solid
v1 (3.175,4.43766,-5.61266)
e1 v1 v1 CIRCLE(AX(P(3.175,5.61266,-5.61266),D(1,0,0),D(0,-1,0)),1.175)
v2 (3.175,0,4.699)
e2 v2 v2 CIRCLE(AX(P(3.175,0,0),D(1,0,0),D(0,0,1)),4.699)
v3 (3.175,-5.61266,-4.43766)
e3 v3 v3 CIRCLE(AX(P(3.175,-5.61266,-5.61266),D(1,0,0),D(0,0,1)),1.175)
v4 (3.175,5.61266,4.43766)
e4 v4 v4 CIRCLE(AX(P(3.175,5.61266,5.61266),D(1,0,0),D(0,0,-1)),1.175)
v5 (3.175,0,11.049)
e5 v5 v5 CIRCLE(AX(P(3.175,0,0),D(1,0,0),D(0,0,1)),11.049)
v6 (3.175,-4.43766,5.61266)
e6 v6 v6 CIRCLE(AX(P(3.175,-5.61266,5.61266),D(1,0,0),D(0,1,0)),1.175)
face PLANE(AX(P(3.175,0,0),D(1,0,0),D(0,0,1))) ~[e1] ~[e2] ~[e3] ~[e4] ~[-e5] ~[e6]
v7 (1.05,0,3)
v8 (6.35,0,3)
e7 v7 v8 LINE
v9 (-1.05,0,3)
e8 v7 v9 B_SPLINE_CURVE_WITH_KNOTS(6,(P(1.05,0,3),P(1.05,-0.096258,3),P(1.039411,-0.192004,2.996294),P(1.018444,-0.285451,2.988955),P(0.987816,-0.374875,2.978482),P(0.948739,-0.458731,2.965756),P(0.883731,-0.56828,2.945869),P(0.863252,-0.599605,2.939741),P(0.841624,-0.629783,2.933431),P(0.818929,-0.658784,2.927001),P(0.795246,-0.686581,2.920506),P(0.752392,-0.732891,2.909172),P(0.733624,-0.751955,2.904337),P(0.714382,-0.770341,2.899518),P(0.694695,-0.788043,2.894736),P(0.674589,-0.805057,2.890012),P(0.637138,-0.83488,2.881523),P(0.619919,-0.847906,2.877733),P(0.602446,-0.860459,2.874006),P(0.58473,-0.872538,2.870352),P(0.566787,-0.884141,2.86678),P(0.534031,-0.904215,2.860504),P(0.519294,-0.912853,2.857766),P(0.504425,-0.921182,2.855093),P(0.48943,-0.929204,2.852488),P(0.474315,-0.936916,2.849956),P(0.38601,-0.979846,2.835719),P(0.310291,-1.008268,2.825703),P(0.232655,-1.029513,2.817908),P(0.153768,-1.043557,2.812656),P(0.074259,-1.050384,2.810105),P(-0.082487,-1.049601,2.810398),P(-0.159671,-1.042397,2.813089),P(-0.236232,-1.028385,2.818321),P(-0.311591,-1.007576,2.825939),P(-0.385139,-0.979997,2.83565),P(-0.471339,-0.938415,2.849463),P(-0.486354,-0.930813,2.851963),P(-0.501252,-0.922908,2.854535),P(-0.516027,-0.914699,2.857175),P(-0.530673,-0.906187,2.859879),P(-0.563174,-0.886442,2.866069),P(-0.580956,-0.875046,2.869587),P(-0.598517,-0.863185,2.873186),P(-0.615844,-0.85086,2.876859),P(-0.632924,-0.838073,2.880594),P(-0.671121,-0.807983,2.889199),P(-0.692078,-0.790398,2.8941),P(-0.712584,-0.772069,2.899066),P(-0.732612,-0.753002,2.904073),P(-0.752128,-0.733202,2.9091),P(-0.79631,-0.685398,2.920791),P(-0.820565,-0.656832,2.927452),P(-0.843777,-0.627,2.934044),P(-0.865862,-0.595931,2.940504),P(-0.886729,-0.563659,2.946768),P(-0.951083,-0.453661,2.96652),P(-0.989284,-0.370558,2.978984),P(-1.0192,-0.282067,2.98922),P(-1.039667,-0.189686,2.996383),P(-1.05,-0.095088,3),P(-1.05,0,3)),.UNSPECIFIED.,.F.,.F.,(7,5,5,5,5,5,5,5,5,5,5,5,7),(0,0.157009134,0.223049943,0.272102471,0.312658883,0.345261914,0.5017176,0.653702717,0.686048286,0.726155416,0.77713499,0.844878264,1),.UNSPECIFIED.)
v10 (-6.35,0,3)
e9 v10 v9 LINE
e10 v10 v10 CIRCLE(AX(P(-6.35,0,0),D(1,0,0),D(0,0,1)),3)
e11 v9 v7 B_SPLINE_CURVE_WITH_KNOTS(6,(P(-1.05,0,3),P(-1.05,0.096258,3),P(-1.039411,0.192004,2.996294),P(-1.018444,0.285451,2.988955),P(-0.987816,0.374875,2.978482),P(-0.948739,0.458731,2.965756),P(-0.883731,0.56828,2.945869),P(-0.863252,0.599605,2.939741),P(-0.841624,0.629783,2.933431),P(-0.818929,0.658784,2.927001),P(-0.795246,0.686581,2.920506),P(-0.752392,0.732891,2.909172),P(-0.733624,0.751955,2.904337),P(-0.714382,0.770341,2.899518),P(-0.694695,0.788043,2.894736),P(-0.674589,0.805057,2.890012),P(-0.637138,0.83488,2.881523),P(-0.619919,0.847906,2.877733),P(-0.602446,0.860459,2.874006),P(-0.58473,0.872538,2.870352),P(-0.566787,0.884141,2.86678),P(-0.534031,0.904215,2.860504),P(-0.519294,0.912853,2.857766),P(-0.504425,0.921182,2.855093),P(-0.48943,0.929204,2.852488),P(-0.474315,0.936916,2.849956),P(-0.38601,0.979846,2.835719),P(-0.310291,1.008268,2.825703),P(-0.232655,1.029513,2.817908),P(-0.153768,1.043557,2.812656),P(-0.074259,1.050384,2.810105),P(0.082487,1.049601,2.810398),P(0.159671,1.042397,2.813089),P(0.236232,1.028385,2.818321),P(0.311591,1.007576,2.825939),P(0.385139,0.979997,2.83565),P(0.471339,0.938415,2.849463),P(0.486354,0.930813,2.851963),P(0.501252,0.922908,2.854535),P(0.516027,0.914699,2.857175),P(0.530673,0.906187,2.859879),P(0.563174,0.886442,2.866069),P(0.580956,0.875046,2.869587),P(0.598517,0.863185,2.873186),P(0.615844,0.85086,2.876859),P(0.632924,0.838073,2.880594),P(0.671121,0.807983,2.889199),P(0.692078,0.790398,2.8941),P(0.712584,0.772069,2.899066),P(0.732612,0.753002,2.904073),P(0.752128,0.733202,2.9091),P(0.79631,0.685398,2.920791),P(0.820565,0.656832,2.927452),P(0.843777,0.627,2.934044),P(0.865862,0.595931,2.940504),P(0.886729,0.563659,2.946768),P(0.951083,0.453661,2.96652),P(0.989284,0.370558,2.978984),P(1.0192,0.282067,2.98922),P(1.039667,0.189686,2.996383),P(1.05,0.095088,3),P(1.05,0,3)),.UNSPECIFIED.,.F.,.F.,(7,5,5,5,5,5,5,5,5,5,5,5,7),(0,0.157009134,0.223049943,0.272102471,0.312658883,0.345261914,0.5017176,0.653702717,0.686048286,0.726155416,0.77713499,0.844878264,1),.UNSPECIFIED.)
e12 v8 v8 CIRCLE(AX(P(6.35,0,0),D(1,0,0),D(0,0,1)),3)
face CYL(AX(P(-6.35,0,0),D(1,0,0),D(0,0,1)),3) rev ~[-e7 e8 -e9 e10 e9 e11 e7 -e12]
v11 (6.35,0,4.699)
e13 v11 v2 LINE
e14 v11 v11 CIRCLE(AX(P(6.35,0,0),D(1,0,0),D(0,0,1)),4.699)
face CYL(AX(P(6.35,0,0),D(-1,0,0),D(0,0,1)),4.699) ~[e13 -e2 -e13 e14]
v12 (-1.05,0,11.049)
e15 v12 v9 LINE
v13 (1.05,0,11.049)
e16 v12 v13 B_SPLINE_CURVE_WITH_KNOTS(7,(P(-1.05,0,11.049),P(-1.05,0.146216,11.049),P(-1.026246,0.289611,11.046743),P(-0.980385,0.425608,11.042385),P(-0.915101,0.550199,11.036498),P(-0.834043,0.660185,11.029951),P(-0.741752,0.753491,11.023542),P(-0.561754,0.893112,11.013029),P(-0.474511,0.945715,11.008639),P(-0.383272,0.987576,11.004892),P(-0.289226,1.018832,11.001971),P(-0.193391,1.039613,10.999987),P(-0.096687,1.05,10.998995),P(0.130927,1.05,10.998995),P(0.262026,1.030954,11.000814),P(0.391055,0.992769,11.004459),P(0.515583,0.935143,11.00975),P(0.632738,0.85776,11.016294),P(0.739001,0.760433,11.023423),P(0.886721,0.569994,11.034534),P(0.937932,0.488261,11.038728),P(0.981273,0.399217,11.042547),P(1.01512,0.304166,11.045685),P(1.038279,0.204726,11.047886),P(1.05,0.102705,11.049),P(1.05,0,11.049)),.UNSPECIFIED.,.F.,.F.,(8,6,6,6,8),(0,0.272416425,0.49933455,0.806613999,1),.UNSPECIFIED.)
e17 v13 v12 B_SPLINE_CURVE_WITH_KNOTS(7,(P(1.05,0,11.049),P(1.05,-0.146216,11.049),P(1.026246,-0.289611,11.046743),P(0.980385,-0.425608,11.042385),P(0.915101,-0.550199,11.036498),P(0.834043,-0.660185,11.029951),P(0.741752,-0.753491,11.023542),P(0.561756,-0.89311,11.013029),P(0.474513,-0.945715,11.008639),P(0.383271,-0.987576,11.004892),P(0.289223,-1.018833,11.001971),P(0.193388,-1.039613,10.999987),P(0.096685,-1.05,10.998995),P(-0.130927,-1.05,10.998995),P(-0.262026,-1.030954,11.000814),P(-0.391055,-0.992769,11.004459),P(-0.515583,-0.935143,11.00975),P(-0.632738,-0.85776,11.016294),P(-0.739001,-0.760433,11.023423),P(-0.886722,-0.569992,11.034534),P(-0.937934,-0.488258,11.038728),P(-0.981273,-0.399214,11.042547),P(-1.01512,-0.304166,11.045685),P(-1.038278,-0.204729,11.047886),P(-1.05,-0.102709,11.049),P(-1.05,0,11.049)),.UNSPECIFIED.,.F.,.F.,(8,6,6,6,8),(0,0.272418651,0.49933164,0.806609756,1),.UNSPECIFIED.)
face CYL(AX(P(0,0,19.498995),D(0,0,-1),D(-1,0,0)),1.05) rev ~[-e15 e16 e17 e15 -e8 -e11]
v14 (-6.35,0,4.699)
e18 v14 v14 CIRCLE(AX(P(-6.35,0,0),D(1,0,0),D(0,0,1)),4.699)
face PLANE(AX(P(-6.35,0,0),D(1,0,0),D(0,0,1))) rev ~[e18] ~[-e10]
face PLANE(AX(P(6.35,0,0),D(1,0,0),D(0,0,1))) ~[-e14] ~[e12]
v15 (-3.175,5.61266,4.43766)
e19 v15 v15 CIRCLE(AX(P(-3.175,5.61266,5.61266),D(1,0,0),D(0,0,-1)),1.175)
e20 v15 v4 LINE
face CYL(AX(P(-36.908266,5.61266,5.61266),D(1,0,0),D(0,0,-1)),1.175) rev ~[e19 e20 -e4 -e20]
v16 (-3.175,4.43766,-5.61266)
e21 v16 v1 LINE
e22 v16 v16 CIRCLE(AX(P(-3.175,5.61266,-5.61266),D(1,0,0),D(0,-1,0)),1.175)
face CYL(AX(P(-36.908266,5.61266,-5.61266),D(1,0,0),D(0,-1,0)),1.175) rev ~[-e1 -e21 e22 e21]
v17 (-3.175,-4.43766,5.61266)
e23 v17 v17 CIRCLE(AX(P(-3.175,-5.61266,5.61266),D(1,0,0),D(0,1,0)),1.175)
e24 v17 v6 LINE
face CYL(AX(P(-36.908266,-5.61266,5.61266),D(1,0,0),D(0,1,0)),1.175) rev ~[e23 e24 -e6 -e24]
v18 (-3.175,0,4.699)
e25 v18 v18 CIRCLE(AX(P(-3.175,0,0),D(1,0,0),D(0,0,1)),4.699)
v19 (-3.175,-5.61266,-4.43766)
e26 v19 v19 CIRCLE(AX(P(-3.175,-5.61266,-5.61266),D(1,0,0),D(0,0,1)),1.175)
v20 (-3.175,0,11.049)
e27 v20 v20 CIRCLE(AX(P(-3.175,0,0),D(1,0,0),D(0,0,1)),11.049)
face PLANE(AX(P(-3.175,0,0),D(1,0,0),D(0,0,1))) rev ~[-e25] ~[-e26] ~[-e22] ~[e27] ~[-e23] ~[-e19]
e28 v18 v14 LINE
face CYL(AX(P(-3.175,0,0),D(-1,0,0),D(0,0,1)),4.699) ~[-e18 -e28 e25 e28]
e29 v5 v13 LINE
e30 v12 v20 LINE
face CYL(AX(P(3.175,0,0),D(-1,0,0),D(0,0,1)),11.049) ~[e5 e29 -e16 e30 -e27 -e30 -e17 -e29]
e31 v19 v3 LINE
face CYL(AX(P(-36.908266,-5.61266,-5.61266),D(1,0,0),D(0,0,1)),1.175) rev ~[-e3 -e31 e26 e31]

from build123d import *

# Parameters (mm, degrees)
F3_D            = 2.35
F3_COPIES_COUNT = 4
F7_D            = 2.1
F7_DEPTH        = 8.5
F7_START        = 0.0500046
F7_TIP          = 0.63090365


# Not quite as in the source:
# - a pattern or mirror of a feature is missing from the dataset's text; its kind, count and spacing are read off the source's solid


with BuildPart() as f1:
    # F0 (on Front) → F1 (revolve)
    with BuildSketch(Plane.XZ):
        Polygon((-6.35, 4.699), (-6.35, 3), (6.35, 3), (6.35, 4.699), (3.175, 4.699), (3.175, 11.049), (-3.175, 11.049), (-3.175, 4.699), align=None)
    revolve(axis=Axis((0, 0, 0), (1, 0, 0)))

    # F3 (through all)
    with Locations(Plane(origin=(-3.175, 0, 0), x_dir=(0, -1, 0), z_dir=(-1, 0, 0))):
        with Locations((5.6126600757, 5.6126600757)):
            f3 = Hole(F3_D / 2)

    # F3_copies: F3 ×4 about axis
    f3_copies_axis = Axis((0, 0, 0), (1, 0, 0))
    for i in range(1, F3_COPIES_COUNT):
        add(f3.rotate(f3_copies_axis, i * 360 / F3_COPIES_COUNT), mode=Mode.SUBTRACT)

    # F7
    # its depths count from where the whole tool has entered the part; down to there all is cleared
    with Locations(Plane.XY.offset(11.049).offset(-F7_START)):
        with Locations((0, 0)):
            Hole(F7_D / 2, depth=F7_DEPTH)
            with Locations((0, 0, -(F7_DEPTH + F7_TIP / 2))):  # 118° drill point
                Cone(0, F7_D / 2, F7_TIP, mode=Mode.SUBTRACT)


solid = f1.part
